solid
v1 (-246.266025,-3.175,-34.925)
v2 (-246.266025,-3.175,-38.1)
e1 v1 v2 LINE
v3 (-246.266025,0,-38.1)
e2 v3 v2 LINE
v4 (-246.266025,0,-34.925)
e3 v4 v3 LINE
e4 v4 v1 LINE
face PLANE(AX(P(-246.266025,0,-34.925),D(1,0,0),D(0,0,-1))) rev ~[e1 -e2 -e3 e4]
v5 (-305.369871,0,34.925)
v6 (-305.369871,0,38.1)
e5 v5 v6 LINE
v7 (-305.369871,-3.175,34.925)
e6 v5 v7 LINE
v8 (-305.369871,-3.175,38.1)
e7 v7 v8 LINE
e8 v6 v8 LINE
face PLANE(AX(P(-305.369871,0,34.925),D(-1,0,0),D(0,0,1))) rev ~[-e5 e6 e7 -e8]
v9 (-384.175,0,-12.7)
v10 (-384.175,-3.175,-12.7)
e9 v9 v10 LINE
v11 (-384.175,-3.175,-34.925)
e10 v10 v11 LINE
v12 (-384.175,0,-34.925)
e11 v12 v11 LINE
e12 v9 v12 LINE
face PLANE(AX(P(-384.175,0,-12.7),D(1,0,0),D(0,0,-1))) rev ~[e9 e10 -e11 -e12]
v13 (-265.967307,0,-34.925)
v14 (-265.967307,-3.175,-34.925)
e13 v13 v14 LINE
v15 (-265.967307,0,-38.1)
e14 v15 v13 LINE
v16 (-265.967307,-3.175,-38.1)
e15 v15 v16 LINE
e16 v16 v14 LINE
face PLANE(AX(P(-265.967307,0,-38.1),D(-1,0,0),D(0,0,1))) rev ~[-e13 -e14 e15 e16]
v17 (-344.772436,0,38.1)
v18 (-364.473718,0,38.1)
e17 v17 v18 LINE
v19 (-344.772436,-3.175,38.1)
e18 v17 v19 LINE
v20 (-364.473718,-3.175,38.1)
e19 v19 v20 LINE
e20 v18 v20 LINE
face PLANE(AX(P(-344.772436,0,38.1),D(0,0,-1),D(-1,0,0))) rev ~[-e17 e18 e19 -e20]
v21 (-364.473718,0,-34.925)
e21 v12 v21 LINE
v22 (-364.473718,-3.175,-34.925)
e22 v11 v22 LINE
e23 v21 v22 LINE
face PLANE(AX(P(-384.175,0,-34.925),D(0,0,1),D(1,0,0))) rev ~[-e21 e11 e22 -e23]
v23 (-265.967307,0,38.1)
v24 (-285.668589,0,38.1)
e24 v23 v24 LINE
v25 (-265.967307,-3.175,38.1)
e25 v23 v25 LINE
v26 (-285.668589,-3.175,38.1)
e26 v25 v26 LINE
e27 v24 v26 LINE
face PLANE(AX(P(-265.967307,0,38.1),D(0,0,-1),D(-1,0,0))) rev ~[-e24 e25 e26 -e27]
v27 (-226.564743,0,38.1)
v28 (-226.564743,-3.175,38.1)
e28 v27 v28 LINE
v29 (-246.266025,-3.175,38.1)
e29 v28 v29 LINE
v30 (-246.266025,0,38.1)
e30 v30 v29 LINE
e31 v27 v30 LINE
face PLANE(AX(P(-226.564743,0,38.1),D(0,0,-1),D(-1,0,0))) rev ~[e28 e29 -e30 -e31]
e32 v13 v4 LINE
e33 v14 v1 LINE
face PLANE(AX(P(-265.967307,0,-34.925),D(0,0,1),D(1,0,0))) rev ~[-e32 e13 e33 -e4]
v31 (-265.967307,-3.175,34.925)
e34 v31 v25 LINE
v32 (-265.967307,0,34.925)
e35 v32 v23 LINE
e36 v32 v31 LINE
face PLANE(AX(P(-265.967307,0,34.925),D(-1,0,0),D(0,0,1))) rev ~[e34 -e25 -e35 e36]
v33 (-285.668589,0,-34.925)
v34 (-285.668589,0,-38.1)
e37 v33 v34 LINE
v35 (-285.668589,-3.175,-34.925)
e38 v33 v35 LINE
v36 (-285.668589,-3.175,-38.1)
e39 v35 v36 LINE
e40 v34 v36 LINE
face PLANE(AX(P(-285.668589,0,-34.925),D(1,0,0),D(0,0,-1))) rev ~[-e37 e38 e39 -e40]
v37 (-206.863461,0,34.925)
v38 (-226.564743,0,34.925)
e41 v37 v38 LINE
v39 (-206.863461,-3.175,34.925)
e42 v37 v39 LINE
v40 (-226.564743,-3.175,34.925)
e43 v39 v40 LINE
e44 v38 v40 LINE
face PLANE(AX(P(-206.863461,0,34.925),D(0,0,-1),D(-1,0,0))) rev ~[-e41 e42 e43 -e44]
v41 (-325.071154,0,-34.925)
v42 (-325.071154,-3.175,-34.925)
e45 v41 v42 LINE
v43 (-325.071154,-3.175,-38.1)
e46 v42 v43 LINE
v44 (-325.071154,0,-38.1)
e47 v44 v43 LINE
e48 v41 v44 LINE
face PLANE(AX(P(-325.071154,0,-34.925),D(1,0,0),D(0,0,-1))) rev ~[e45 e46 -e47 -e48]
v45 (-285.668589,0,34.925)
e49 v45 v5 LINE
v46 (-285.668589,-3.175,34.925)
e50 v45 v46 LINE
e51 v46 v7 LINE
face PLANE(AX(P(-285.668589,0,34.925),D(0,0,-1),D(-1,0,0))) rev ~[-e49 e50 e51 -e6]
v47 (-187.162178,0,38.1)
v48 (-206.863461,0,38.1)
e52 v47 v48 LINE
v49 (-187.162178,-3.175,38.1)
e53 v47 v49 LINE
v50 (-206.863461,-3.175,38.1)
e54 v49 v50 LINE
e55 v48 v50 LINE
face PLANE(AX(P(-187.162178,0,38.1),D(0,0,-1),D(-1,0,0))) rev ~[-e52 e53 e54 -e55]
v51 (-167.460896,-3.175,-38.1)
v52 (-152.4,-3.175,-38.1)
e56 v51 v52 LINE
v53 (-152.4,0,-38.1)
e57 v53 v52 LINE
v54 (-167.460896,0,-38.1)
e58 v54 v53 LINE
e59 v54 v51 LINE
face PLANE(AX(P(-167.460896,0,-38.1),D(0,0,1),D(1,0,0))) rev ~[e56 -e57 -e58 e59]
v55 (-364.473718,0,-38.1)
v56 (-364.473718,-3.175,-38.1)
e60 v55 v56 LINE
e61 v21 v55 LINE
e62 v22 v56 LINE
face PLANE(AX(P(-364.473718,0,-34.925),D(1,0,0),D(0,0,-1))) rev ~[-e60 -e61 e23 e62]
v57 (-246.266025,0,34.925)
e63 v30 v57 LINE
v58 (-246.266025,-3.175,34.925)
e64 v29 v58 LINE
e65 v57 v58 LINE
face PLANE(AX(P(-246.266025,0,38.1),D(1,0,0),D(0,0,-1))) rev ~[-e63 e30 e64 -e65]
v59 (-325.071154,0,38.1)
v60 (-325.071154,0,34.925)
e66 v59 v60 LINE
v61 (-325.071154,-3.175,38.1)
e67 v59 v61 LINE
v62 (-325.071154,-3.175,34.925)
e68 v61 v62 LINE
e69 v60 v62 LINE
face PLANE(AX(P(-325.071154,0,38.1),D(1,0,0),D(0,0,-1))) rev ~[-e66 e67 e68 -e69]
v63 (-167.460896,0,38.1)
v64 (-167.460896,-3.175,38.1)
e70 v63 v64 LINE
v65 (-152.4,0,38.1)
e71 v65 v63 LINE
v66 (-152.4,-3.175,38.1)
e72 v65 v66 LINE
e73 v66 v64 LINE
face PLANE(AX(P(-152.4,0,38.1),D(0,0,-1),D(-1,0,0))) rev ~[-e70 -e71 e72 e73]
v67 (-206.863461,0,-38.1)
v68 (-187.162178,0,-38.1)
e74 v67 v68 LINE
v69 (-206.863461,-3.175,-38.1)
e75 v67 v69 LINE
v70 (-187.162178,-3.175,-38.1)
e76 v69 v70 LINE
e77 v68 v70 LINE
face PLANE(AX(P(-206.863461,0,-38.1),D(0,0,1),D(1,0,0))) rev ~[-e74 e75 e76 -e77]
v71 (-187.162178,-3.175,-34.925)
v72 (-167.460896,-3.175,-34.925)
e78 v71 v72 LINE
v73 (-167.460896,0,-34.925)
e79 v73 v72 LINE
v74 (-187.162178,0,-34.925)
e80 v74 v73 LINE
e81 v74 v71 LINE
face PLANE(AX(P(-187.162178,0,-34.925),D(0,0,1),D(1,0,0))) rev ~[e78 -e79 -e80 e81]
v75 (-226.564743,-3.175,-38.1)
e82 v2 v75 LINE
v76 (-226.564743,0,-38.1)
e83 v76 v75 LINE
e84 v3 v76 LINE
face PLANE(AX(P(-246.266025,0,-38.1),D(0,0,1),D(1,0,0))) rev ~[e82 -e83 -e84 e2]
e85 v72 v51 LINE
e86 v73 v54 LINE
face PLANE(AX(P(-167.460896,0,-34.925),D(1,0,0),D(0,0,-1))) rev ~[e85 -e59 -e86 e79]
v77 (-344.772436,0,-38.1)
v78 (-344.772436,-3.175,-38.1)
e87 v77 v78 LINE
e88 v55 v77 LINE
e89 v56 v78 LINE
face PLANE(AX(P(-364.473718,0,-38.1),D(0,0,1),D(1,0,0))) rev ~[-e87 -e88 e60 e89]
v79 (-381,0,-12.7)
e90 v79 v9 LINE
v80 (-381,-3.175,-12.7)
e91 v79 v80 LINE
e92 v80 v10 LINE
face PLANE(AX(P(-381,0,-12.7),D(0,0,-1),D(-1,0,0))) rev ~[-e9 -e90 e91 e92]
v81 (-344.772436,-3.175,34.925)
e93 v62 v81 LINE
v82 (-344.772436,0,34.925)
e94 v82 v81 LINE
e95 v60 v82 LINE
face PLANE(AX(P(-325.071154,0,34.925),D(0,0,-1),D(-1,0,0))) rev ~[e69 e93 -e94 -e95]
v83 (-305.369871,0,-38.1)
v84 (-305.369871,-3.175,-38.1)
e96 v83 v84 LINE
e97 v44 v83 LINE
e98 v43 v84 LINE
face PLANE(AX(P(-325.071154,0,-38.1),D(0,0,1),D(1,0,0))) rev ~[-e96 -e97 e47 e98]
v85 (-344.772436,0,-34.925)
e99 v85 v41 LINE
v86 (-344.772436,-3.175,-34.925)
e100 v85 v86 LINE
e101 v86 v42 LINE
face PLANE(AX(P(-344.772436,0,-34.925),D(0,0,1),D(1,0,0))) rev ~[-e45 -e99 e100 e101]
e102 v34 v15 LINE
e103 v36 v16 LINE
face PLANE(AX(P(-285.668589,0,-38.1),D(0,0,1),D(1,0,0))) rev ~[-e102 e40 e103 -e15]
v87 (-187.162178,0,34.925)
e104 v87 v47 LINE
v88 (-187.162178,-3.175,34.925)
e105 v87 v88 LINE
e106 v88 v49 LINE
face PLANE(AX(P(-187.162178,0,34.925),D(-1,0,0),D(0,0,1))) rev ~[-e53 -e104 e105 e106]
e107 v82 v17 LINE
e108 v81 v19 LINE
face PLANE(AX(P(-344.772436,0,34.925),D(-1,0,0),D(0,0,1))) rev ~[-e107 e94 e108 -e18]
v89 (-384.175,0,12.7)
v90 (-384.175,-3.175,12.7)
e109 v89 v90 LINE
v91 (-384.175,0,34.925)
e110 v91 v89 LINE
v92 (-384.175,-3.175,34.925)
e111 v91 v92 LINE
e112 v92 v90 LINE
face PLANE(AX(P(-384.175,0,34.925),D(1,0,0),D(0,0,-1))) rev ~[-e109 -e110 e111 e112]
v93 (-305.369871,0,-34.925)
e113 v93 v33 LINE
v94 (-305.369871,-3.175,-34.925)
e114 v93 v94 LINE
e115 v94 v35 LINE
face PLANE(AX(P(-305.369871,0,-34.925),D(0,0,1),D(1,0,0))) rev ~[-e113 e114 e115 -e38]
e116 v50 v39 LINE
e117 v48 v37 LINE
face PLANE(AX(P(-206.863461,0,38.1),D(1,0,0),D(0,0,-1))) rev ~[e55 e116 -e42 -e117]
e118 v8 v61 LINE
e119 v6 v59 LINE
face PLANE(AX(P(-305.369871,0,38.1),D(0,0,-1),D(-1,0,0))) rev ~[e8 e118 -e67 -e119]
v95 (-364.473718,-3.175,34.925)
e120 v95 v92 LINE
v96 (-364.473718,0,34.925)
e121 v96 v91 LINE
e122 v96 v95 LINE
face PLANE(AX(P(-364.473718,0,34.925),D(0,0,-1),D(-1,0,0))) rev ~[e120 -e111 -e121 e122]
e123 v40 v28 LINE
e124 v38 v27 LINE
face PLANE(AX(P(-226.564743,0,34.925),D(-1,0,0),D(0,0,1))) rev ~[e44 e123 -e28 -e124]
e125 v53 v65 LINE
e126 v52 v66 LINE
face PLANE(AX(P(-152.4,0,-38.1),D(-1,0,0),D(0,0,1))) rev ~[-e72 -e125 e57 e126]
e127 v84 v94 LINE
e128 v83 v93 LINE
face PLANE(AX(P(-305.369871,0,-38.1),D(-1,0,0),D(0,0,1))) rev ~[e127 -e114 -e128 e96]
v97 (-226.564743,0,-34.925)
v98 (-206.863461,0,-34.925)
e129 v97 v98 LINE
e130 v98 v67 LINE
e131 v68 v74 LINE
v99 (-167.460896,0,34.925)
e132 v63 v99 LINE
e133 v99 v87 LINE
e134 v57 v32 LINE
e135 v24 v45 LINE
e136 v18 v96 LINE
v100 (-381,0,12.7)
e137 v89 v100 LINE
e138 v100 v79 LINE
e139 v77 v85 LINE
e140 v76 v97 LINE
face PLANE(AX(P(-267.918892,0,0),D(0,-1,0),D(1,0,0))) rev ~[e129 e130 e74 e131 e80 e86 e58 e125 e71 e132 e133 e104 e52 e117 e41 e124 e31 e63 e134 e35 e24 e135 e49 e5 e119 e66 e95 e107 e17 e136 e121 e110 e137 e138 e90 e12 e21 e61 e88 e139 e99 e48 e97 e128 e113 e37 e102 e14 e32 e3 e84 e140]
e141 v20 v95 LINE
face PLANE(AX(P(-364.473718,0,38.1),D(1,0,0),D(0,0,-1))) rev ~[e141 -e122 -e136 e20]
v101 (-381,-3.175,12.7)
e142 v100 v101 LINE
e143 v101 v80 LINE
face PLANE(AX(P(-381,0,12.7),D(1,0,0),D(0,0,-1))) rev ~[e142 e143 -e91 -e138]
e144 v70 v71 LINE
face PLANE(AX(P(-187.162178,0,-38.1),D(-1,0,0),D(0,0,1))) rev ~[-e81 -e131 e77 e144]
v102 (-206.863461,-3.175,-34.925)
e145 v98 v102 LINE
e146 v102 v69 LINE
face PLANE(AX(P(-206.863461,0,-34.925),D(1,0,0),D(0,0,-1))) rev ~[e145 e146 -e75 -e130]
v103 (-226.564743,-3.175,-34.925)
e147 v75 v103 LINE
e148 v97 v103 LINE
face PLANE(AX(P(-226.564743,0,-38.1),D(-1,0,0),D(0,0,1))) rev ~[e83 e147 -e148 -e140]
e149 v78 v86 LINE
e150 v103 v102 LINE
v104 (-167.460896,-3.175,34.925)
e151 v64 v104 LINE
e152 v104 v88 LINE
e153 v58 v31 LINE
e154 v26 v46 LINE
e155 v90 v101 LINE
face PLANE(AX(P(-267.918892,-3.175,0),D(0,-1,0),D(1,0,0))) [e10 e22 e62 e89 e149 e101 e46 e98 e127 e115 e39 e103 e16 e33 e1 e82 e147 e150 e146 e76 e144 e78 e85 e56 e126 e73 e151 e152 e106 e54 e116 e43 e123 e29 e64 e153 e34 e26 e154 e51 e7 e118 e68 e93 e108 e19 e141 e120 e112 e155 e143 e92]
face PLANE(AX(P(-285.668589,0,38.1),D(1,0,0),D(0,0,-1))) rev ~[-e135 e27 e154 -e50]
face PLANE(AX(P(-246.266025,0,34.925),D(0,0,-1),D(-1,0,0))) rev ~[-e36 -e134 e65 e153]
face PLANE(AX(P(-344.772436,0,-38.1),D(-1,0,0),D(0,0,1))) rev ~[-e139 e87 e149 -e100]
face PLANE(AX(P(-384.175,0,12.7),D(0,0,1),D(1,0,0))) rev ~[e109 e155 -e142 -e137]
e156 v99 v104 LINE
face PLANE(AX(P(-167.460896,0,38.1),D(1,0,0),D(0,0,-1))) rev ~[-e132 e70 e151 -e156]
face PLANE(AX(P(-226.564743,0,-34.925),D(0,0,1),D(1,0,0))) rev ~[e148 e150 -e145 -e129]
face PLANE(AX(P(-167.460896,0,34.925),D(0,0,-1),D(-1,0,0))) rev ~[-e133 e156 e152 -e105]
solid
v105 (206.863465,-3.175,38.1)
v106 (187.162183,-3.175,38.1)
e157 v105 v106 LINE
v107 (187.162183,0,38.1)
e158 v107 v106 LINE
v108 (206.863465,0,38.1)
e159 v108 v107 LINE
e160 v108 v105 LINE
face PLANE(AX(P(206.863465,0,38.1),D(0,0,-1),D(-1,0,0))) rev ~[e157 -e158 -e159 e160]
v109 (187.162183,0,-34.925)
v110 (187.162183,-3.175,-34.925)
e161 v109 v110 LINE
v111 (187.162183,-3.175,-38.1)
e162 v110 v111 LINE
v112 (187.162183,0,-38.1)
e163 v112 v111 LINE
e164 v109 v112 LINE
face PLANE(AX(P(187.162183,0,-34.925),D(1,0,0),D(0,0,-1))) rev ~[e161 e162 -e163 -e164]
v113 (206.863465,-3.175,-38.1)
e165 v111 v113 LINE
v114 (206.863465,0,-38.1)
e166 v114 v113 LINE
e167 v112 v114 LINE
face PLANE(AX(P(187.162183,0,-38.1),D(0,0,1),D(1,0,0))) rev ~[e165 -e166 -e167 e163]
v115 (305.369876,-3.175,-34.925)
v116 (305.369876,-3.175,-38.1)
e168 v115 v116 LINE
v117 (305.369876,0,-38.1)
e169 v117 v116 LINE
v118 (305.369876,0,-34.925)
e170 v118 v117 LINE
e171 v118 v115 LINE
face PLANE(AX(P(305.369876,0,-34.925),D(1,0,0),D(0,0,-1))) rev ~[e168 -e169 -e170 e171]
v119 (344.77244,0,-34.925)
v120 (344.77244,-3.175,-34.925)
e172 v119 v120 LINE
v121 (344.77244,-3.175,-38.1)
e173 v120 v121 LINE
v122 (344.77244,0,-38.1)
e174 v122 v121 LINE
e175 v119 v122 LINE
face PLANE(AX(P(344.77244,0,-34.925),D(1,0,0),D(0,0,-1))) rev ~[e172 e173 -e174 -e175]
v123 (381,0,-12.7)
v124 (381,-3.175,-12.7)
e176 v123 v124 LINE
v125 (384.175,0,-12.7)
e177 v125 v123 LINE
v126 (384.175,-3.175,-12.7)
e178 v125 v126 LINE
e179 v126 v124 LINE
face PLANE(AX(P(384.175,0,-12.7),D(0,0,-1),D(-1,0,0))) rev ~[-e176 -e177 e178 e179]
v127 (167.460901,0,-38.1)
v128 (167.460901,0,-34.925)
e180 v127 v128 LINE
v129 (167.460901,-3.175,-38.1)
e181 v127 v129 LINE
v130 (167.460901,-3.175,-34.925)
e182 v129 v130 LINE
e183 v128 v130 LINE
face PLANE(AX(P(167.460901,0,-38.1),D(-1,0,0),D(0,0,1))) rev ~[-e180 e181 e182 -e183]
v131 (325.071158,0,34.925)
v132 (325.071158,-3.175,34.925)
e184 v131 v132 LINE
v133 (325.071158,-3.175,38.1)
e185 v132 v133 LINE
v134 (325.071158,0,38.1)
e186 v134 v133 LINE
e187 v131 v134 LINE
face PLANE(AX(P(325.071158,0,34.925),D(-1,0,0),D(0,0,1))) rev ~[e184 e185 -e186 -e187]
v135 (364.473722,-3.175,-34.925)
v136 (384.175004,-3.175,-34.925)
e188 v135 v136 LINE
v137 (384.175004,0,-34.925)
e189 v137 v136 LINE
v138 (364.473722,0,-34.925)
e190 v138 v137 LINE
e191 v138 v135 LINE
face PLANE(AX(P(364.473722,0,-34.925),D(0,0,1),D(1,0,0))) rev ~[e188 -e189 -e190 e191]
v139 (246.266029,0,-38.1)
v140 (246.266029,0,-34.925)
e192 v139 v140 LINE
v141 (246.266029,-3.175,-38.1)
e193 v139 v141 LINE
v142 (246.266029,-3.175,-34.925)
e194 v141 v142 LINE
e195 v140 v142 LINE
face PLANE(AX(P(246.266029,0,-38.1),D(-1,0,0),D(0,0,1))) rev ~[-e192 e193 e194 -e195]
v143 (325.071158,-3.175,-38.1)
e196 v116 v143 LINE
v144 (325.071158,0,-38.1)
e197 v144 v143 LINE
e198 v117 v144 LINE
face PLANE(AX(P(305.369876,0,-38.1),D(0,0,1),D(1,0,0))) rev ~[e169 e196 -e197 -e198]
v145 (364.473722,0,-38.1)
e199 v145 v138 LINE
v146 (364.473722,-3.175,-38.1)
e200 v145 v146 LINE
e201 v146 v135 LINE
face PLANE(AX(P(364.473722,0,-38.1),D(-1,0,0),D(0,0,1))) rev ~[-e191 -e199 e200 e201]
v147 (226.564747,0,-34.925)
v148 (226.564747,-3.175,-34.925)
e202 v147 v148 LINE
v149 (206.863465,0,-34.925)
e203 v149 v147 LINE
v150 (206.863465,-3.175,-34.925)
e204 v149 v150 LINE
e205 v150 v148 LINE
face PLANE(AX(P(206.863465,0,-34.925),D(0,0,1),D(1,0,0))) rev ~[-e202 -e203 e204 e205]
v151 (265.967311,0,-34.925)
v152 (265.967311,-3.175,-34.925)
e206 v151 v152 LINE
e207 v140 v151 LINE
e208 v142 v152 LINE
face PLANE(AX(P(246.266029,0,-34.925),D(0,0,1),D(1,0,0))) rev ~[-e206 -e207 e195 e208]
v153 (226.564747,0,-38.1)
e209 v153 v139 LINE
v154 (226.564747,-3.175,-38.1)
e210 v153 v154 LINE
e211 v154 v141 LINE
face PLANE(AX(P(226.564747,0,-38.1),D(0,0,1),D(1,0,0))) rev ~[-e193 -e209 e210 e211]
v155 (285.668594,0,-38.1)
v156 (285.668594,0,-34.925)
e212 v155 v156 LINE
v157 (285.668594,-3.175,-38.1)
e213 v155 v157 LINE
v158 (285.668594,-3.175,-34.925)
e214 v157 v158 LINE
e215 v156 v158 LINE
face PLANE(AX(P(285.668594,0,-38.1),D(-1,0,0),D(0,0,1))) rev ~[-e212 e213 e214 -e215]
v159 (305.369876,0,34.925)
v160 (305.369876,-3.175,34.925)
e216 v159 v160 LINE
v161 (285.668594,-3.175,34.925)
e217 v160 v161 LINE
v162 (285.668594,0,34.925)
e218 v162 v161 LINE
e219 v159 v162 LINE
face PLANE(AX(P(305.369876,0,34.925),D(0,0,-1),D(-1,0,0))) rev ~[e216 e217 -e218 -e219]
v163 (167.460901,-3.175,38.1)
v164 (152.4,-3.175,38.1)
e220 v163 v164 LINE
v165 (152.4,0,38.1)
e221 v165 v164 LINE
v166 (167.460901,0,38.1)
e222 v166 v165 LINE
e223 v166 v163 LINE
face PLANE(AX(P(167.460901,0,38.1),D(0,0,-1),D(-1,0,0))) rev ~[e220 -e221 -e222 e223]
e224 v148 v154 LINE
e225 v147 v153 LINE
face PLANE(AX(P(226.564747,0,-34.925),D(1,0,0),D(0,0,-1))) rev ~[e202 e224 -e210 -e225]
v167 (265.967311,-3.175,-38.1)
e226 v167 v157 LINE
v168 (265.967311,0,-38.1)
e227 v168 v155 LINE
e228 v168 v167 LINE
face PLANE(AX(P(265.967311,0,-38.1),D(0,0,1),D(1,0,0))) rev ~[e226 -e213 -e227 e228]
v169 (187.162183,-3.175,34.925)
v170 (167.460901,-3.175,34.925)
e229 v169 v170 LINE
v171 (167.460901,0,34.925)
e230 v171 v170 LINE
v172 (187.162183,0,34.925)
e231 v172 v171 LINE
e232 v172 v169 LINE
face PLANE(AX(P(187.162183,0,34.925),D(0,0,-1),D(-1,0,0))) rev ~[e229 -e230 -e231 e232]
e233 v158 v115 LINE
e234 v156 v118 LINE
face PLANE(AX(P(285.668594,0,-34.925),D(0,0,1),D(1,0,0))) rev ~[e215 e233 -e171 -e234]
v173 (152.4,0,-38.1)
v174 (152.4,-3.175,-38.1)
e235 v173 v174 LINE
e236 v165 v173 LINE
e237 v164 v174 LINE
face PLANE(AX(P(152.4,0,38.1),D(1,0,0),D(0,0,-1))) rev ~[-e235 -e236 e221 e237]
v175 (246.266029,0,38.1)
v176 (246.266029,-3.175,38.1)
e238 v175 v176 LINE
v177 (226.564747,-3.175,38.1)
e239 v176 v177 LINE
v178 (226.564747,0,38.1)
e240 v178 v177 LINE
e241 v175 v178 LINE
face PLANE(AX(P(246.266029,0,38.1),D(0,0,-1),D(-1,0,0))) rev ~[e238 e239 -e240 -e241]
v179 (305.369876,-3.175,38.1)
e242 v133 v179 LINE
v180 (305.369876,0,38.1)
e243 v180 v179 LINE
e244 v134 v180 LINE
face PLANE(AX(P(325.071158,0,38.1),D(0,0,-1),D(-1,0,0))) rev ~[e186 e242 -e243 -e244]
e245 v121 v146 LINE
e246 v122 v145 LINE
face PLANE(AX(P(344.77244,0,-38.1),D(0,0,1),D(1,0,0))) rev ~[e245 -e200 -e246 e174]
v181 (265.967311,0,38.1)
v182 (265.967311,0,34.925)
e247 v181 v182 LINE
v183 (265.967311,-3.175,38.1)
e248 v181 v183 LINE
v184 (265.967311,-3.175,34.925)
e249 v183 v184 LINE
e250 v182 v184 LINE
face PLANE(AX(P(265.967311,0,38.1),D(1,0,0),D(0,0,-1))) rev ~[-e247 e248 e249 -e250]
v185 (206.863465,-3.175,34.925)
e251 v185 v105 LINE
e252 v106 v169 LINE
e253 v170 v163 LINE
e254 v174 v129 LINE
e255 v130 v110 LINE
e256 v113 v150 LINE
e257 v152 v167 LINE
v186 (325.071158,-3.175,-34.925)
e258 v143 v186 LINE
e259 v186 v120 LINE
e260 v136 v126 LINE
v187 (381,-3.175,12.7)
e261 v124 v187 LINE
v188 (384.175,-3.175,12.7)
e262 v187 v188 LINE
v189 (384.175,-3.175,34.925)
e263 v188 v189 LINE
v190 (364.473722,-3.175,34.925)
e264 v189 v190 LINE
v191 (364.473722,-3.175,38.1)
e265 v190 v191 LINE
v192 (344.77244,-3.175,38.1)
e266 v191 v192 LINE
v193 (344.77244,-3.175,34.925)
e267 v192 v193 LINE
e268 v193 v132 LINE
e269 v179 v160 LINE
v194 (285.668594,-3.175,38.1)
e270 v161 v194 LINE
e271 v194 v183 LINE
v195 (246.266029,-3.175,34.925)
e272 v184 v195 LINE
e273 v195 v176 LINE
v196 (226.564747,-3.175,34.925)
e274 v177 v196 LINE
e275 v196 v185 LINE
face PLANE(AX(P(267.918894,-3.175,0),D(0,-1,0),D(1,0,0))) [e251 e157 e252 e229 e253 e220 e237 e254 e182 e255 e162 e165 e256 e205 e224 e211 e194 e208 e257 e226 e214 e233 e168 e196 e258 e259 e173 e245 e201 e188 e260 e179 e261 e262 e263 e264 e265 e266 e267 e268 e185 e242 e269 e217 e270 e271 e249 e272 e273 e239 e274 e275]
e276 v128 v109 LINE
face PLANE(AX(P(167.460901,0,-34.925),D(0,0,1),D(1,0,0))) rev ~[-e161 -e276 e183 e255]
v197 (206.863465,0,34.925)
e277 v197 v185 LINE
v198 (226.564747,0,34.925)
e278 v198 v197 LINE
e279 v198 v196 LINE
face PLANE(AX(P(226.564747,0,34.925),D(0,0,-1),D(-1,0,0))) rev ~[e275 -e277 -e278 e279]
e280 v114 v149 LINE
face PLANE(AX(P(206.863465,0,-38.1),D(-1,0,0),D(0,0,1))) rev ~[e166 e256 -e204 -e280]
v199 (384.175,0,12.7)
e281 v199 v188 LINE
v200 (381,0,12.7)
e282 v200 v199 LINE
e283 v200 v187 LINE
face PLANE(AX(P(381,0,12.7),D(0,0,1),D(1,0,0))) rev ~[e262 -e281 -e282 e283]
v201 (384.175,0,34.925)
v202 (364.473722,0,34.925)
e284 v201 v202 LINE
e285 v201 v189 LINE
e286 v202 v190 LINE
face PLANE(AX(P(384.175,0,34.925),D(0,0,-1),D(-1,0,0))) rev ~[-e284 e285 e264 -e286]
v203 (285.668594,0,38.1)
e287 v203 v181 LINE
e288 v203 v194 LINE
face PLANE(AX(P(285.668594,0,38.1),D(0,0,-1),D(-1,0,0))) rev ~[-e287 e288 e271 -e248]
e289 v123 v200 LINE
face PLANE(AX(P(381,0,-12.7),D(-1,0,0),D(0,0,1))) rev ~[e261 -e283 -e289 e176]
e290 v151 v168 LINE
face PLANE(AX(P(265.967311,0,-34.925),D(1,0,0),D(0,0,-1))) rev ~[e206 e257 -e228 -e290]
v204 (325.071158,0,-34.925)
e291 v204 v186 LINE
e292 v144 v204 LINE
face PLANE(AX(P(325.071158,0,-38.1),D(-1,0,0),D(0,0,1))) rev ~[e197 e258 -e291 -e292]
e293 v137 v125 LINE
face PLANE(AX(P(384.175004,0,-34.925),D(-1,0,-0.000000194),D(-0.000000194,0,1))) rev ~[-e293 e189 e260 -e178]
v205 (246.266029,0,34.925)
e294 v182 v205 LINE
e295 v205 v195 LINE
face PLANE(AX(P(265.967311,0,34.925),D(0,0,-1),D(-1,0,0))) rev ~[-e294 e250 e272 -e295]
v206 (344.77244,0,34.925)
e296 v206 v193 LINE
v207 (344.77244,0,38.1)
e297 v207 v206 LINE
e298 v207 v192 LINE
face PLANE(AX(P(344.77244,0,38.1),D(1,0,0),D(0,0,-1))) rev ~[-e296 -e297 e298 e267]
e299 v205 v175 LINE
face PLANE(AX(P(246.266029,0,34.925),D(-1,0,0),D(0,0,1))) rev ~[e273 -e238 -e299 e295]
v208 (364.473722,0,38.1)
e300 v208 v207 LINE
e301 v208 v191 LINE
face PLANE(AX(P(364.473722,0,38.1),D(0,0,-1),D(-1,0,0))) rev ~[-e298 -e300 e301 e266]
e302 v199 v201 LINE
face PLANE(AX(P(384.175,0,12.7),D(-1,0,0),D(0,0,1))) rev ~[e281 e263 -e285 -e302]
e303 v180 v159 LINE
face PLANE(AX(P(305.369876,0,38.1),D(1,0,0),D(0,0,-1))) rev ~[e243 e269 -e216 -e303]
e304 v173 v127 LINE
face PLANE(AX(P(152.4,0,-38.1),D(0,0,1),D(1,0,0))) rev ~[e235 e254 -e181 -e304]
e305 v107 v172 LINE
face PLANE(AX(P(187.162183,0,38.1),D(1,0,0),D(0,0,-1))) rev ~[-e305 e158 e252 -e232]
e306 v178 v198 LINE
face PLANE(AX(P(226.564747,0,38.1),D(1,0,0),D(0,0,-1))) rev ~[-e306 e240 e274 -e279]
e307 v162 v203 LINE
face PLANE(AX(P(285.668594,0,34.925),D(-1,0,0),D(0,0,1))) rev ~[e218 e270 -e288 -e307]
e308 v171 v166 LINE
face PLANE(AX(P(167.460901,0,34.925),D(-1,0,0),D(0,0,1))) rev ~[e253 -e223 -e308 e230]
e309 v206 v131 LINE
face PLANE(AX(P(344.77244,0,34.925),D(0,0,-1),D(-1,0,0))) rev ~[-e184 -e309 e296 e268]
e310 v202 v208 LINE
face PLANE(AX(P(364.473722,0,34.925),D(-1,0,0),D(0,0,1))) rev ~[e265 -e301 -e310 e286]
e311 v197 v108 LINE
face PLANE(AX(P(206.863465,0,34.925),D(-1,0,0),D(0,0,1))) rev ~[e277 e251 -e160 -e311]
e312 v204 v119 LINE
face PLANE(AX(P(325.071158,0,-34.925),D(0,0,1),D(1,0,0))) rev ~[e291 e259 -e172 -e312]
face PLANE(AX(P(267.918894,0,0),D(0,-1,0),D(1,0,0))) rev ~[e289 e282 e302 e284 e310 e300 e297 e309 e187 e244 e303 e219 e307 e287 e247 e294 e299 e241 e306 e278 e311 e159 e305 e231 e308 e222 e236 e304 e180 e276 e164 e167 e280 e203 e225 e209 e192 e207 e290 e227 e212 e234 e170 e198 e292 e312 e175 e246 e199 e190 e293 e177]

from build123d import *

# Parameters (mm, degrees)
F1_DEPTH = 3.175


# Not quite as in the source:
# - ends of sketch curves that miss each other by under 0.0002 mm in the source are joined


with BuildPart() as f1:
    # F0 (on Front) → F1 (new body)
    with BuildSketch(Plane.XZ):
        Polygon((-384.175, 34.925), (-384.175, 12.7), (-381, 12.7), (-381, -12.7), (-384.175, -12.7), (-384.175, -34.925), (-364.473717838, -34.925), (-364.473717838, -38.1), (-344.772435676, -38.1), (-344.772435676, -34.925), (-325.071153514, -34.925), (-325.071153514, -38.1), (-305.369871352, -38.1), (-305.369871352, -34.925), (-285.66858919, -34.925), (-285.66858919, -38.1), (-265.967307028, -38.1), (-265.967307028, -34.925), (-246.266024866, -34.925), (-246.266024866, -38.1), (-226.564742704, -38.1), (-226.564742704, -34.925), (-206.863460542, -34.925), (-206.863460542, -38.1), (-187.16217838, -38.1), (-187.16217838, -34.925), (-167.460896218, -34.925), (-167.460896218, -38.1), (-152.4, -38.1), (-152.4, 38.1), (-167.460896218, 38.1), (-167.460896218, 34.925), (-187.16217838, 34.925), (-187.16217838, 38.1), (-206.863460542, 38.1), (-206.863460542, 34.925), (-226.564742704, 34.925), (-226.564742704, 38.1), (-246.266024866, 38.1), (-246.266024866, 34.925), (-265.967307028, 34.925), (-265.967307028, 38.1), (-285.66858919, 38.1), (-285.66858919, 34.925), (-305.369871352, 34.925), (-305.369871352, 38.1), (-325.071153514, 38.1), (-325.071153514, 34.925), (-344.772435676, 34.925), (-344.772435676, 38.1), (-364.473717838, 38.1), (-364.473717838, 34.925), align=None)
    extrude(amount=F1_DEPTH)


with BuildPart() as f1b:
    # F0 (on Front) → F1, piece 2 (new body)
    with BuildSketch(Plane.XZ):
        Polygon((167.460900536, 38.1), (152.4, 38.1), (152.4, -38.1), (167.460900536, -38.1), (167.460900536, -34.925), (187.162182698, -34.925), (187.162182698, -38.1), (206.86346486, -38.1), (206.86346486, -34.925), (226.564747022, -34.925), (226.564747022, -38.1), (246.266029184, -38.1), (246.266029184, -34.925), (265.967311346, -34.925), (265.967311346, -38.1), (285.668593508, -38.1), (285.668593508, -34.925), (305.36987567, -34.925), (305.36987567, -38.1), (325.071157832, -38.1), (325.071157832, -34.925), (344.772439994, -34.925), (344.772439994, -38.1), (364.473722156, -38.1), (364.473722156, -34.925), (384.175004318, -34.925), (384.175, -12.7), (381, -12.7), (381, 12.7), (384.175, 12.7), (384.175, 34.925), (364.473722156, 34.925), (364.473722156, 38.1), (344.772439994, 38.1), (344.772439994, 34.925), (325.071157832, 34.925), (325.071157832, 38.1), (305.36987567, 38.1), (305.36987567, 34.925), (285.668593508, 34.925), (285.668593508, 38.1), (265.967311346, 38.1), (265.967311346, 34.925), (246.266029184, 34.925), (246.266029184, 38.1), (226.564747022, 38.1), (226.564747022, 34.925), (206.86346486, 34.925), (206.86346486, 38.1), (187.162182698, 38.1), (187.162182698, 34.925), (167.460900536, 34.925), align=None)
    extrude(amount=F1_DEPTH)


solid = Compound([f1.part, f1b.part])
